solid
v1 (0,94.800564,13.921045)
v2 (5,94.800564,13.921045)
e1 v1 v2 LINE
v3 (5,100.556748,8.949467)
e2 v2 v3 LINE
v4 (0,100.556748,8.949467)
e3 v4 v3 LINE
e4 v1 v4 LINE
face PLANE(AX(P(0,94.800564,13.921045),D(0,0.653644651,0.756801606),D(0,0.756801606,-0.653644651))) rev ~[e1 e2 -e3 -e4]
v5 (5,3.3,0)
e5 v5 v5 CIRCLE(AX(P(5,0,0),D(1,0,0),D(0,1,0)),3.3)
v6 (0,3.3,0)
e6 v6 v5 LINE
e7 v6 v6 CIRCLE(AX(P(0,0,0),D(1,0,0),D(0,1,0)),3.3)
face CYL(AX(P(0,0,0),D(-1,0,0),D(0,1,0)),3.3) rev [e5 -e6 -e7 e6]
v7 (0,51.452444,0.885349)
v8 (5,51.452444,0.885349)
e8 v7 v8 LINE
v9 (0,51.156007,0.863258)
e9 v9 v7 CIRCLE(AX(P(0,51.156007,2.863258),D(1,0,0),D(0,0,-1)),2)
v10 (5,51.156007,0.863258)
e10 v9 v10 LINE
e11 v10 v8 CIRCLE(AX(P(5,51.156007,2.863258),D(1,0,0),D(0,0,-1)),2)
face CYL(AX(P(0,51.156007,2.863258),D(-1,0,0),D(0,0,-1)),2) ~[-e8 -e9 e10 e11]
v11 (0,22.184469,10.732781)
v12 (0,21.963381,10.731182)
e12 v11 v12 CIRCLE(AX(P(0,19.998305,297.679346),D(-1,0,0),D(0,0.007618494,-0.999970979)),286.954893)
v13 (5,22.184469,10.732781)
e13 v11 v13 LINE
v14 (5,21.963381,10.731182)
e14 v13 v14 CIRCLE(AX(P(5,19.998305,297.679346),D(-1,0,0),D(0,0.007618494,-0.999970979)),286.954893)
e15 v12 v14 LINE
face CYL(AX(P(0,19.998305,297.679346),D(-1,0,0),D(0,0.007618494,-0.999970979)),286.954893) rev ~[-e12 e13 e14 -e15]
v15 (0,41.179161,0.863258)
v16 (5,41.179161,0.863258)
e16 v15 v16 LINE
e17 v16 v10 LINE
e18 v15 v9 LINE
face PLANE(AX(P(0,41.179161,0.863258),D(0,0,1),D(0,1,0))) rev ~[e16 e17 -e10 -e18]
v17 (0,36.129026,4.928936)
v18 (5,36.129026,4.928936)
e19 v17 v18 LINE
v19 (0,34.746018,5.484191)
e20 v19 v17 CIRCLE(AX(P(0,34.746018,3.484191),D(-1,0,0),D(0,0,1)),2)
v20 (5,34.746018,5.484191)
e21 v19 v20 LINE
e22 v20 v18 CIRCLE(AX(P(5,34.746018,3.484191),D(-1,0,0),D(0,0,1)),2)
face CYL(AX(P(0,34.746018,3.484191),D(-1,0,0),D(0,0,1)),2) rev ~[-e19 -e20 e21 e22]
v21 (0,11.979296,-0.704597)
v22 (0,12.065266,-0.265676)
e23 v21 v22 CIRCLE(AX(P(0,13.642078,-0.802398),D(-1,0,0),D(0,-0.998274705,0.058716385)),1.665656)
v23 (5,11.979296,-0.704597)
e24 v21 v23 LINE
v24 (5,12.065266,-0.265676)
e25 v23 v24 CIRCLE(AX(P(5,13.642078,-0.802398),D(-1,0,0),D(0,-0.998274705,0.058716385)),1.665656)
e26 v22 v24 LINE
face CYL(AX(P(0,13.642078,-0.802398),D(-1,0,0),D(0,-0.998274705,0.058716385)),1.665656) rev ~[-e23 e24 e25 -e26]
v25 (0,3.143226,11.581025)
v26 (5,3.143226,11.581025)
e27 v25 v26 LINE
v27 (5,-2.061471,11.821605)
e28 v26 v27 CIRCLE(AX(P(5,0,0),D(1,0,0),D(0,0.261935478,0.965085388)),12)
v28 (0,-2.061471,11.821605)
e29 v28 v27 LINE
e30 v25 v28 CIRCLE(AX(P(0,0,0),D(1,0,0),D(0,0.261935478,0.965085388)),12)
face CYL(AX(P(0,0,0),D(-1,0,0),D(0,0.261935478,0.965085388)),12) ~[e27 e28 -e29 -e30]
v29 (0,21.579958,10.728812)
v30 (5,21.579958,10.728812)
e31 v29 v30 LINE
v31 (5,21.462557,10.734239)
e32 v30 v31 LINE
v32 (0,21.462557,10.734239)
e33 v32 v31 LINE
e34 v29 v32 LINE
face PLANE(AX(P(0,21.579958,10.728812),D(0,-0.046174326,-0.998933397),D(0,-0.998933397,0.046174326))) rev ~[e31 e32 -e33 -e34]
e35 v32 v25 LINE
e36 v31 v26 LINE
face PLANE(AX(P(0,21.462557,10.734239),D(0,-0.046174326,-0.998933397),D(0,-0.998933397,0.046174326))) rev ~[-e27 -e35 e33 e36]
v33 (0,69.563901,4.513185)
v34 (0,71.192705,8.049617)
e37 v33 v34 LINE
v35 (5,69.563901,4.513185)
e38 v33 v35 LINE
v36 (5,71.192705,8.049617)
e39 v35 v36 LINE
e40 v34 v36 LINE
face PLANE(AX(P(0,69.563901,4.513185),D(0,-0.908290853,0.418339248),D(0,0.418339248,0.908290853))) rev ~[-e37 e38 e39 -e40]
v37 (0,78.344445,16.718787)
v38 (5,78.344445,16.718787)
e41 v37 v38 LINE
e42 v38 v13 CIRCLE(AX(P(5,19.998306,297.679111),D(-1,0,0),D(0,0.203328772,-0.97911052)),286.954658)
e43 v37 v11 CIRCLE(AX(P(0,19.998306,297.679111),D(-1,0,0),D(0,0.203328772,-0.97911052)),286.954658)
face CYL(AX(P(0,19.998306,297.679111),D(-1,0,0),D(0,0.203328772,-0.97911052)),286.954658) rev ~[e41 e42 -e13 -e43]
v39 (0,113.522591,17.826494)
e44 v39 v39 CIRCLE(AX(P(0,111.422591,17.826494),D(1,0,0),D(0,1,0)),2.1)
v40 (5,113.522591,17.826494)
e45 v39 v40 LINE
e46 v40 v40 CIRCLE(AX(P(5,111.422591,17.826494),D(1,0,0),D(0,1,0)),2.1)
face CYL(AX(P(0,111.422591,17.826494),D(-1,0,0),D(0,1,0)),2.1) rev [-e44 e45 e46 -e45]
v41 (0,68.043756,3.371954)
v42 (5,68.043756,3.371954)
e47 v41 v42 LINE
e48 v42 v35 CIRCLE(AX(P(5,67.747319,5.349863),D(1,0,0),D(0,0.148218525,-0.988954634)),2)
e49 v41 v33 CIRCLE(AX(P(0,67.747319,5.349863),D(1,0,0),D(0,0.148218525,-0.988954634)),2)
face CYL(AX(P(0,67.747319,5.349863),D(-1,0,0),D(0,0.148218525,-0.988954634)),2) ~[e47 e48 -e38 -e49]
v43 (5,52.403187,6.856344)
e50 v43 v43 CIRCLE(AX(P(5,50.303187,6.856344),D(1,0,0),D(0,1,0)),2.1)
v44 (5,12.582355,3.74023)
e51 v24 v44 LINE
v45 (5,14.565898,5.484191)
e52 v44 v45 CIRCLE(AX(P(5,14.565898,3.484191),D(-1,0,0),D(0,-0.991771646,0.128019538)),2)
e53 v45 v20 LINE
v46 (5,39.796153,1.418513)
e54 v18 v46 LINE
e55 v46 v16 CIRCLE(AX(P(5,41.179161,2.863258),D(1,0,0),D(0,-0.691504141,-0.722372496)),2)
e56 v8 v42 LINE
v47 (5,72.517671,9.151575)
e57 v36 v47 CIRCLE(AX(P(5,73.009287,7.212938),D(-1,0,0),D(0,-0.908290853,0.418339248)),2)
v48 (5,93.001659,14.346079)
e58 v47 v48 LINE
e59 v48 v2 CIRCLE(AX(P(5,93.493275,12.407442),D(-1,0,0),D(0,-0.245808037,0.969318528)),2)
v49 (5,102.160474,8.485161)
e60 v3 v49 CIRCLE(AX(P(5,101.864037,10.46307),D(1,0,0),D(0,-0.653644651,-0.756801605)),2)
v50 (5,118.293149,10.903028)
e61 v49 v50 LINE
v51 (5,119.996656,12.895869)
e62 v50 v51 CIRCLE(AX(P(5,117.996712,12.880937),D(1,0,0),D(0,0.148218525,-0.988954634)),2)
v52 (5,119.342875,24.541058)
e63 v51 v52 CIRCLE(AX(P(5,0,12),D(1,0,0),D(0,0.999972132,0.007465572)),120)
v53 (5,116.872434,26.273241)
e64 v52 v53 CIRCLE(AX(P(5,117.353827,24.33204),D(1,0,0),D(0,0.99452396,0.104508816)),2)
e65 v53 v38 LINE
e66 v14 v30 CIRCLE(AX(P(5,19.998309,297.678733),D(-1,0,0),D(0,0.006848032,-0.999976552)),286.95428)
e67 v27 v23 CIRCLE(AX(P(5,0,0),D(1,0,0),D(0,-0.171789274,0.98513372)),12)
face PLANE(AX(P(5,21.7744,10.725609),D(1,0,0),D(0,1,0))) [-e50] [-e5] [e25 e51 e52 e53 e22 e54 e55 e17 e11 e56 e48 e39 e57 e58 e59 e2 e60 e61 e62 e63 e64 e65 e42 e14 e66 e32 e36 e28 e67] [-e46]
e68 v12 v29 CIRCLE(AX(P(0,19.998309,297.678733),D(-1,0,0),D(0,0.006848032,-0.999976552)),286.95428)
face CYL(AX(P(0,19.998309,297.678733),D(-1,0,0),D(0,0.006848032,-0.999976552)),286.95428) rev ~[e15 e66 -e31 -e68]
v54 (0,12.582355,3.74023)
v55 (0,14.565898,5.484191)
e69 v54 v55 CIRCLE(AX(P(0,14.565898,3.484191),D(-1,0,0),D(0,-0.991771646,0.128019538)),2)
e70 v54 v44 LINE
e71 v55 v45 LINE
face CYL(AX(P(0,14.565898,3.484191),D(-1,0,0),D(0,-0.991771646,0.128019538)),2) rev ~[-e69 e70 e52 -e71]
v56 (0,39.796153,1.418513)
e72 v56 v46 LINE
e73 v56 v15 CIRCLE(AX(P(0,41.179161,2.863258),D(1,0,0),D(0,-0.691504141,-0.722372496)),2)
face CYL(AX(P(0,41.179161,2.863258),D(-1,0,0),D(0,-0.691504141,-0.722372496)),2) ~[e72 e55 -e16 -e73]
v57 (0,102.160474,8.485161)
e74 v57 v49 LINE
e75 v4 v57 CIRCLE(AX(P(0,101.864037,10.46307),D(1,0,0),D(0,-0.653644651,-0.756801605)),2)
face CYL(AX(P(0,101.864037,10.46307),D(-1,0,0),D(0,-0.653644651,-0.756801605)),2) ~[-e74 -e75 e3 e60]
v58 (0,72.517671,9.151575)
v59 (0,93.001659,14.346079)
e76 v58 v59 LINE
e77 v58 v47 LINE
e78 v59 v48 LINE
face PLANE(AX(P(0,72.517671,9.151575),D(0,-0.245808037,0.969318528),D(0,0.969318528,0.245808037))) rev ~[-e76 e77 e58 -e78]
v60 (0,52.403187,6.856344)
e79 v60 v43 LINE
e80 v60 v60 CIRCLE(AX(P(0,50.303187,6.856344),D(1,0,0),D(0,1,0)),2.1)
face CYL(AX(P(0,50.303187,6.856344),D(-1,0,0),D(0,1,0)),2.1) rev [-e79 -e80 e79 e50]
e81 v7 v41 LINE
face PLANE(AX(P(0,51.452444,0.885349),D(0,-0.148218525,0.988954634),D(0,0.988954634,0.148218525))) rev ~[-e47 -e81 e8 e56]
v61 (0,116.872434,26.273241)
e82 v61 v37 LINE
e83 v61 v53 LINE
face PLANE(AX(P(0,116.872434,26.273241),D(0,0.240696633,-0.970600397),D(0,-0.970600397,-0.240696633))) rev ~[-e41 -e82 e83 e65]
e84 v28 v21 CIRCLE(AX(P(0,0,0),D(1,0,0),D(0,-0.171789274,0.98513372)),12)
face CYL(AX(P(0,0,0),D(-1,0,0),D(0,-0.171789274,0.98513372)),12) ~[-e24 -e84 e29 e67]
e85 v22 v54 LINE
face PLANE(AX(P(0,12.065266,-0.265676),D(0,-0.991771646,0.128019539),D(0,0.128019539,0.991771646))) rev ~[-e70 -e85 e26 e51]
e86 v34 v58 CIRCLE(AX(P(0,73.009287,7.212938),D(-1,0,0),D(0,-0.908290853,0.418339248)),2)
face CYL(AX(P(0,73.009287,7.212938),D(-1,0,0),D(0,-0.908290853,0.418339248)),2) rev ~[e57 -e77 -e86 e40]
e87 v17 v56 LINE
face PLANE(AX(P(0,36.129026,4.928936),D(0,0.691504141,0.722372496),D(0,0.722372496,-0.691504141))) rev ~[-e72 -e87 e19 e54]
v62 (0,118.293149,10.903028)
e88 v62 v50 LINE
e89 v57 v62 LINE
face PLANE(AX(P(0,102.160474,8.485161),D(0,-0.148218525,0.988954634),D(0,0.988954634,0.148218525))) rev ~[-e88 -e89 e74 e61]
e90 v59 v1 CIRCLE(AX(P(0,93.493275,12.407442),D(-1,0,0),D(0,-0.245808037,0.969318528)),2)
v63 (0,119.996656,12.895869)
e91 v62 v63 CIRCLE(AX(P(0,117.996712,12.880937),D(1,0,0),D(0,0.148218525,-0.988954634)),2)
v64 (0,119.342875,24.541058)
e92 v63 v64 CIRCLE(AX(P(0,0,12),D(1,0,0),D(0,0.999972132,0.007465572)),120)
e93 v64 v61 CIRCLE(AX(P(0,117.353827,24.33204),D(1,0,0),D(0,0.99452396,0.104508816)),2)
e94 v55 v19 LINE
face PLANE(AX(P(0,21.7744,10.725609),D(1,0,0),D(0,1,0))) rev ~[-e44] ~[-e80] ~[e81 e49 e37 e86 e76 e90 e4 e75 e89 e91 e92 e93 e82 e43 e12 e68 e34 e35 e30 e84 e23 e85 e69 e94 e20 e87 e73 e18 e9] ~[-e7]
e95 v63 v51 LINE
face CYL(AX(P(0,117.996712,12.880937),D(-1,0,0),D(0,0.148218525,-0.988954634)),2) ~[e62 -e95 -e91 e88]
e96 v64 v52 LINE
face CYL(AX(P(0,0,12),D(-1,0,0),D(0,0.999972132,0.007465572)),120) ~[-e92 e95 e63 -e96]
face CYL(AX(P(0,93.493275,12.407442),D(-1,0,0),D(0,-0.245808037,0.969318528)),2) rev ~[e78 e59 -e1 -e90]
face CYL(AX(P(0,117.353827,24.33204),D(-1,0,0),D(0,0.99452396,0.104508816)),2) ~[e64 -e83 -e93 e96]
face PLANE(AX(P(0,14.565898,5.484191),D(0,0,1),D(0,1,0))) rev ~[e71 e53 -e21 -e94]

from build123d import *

# Parameters (mm, degrees)
F0_R     = 3.3
F0_R_2   = 2.1
F1_DEPTH = 5


# Not quite as in the source:
# - a feature names something its author has since deleted; it is built from what else it names


with BuildPart() as f1:
    # F0 (on Right) → F1 (new body)
    with BuildSketch(Plane.YZ):
        with BuildLine():
            ThreePointArc((21.8315579223, 10.717182122), (21.897134346, 10.7177196915), (21.9626931438, 10.7193322557))
            ThreePointArc((21.9626931438, 10.7193322557), (21.9630378123, 10.7252568669), (21.9633808826, 10.731181571))
            ThreePointArc((21.9633808826, 10.731181571), (21.7716697335, 10.7299327404), (21.5799577929, 10.728811993))
            Line((21.5799577929, 10.728811993), (21.8315579223, 10.717182122))
        make_face()
        with BuildLine():
            ThreePointArc((22.1844688263, 10.7327808001), (22.0736743793, 10.7245163933), (21.9626931438, 10.7193322557))
            ThreePointArc((21.9626931438, 10.7193322557), (21.897134346, 10.7177196915), (21.8315579223, 10.717182122))
            ThreePointArc((21.8315579223, 10.717182122), (21.6468606164, 10.7214485341), (21.4625573078, 10.7342386694))
            Line((21.4625573078, 10.7342386694), (3.1432257368, 11.581024651))
            Line((3.1432257368, 11.581024651), (-2.0614712889, 11.8216046341))
            ThreePointArc((-2.0614712889, 11.8216046341), (-7.9885695505, -8.9544824829), (11.9792964571, -0.7045966171))
            ThreePointArc((11.9792964571, -0.7045966171), (12.0074816864, -0.4822378377), (12.0652655082, -0.2656763826))
            Line((12.0652655082, -0.2656763826), (12.5823545671, 3.7402298466))
            ThreePointArc((12.5823545671, 3.7402298466), (13.2453067327, 4.9862024463), (14.565897859, 5.4841907695))
            Line((14.565897859, 5.4841907695), (34.746018001, 5.4841907695))
            ThreePointArc((34.746018001, 5.4841907695), (35.4911723527, 5.3401931919), (36.1290262829, 4.9289357615))
            Line((36.1290262829, 4.9289357615), (39.7961525429, 1.4185128035))
            ThreePointArc((39.7961525429, 1.4185128035), (40.4340064731, 1.0072553731), (41.1791608249, 0.8632577956))
            Line((41.1791608249, 0.8632577956), (51.1560065331, 0.8632577956))
            ThreePointArc((51.1560065331, 0.8632577956), (51.3046360431, 0.8687881245), (51.452443583, 0.8853485268))
            Line((51.452443583, 0.8853485268), (68.043755982, 3.3719538424))
            ThreePointArc((68.043755982, 3.3719538424), (68.9480745213, 3.750430082), (69.5639006382, 4.5131846154))
            Line((69.5639006382, 4.5131846154), (71.1927053136, 8.0496168184))
            ThreePointArc((71.1927053136, 8.0496168184), (71.7304115705, 8.7506241115), (72.5176709464, 9.151575379))
            Line((72.5176709464, 9.151575379), (93.0016589096, 14.3460792675))
            ThreePointArc((93.0016589096, 14.3460792675), (93.9531599103, 14.3538506609), (94.800564285, 13.9210454222))
            Line((94.800564285, 13.9210454222), (100.5567479715, 8.9494668086))
            ThreePointArc((100.5567479715, 8.9494668086), (101.3078443235, 8.5419637232), (102.1604743235, 8.4851607509))
            Line((102.1604743235, 8.4851607509), (118.2931486533, 10.9030281733))
            ThreePointArc((118.2931486533, 10.9030281733), (119.516973098, 11.5813971433), (119.9966558679, 12.8958685851))
            ThreePointArc((119.9966558679, 12.8958685851), (119.8113324935, 18.7264110882), (119.3428752162, 24.5410579746))
            ThreePointArc((119.3428752162, 24.5410579746), (118.5020303548, 25.9696085801), (116.872434029, 26.2732411356))
            Line((116.872434029, 26.2732411356), (78.344444671, 16.7187866332))
            ThreePointArc((78.344444671, 16.7187866332), (50.4120849121, 12.3407543123), (22.1844688263, 10.7327808001))
        make_face()
        Circle(F0_R, mode=Mode.SUBTRACT)
        with Locations((50.3031872213, 6.8563437089)):
            Circle(F0_R_2, mode=Mode.SUBTRACT)
        with Locations((111.4225909114, 17.8264938295)):
            Circle(F0_R_2, mode=Mode.SUBTRACT)
        with BuildLine():
            ThreePointArc((21.9633808826, 10.731181571), (21.9630378123, 10.7252568669), (21.9626931438, 10.7193322557))
            ThreePointArc((21.9626931438, 10.7193322557), (22.0736743793, 10.7245163933), (22.1844688263, 10.7327808001))
            ThreePointArc((22.1844688263, 10.7327808001), (22.0739250085, 10.7319598925), (21.9633808826, 10.731181571))
        make_face()
        with BuildLine():
            ThreePointArc((21.4625573078, 10.7342386694), (21.6468606164, 10.7214485341), (21.8315579223, 10.717182122))
            Line((21.8315579223, 10.717182122), (21.5799577929, 10.728811993))
            Line((21.5799577929, 10.728811993), (21.4625573078, 10.7342386694))
        make_face()
        with BuildLine():
            Line((-2.0614712889, 11.8216046341), (3.1432257368, 11.581024651))
            ThreePointArc((3.1432257368, 11.581024651), (0.5540919179, 11.9872007636), (-2.0614712889, 11.8216046341))
        make_face()
    extrude(amount=F1_DEPTH)


solid = f1.part
